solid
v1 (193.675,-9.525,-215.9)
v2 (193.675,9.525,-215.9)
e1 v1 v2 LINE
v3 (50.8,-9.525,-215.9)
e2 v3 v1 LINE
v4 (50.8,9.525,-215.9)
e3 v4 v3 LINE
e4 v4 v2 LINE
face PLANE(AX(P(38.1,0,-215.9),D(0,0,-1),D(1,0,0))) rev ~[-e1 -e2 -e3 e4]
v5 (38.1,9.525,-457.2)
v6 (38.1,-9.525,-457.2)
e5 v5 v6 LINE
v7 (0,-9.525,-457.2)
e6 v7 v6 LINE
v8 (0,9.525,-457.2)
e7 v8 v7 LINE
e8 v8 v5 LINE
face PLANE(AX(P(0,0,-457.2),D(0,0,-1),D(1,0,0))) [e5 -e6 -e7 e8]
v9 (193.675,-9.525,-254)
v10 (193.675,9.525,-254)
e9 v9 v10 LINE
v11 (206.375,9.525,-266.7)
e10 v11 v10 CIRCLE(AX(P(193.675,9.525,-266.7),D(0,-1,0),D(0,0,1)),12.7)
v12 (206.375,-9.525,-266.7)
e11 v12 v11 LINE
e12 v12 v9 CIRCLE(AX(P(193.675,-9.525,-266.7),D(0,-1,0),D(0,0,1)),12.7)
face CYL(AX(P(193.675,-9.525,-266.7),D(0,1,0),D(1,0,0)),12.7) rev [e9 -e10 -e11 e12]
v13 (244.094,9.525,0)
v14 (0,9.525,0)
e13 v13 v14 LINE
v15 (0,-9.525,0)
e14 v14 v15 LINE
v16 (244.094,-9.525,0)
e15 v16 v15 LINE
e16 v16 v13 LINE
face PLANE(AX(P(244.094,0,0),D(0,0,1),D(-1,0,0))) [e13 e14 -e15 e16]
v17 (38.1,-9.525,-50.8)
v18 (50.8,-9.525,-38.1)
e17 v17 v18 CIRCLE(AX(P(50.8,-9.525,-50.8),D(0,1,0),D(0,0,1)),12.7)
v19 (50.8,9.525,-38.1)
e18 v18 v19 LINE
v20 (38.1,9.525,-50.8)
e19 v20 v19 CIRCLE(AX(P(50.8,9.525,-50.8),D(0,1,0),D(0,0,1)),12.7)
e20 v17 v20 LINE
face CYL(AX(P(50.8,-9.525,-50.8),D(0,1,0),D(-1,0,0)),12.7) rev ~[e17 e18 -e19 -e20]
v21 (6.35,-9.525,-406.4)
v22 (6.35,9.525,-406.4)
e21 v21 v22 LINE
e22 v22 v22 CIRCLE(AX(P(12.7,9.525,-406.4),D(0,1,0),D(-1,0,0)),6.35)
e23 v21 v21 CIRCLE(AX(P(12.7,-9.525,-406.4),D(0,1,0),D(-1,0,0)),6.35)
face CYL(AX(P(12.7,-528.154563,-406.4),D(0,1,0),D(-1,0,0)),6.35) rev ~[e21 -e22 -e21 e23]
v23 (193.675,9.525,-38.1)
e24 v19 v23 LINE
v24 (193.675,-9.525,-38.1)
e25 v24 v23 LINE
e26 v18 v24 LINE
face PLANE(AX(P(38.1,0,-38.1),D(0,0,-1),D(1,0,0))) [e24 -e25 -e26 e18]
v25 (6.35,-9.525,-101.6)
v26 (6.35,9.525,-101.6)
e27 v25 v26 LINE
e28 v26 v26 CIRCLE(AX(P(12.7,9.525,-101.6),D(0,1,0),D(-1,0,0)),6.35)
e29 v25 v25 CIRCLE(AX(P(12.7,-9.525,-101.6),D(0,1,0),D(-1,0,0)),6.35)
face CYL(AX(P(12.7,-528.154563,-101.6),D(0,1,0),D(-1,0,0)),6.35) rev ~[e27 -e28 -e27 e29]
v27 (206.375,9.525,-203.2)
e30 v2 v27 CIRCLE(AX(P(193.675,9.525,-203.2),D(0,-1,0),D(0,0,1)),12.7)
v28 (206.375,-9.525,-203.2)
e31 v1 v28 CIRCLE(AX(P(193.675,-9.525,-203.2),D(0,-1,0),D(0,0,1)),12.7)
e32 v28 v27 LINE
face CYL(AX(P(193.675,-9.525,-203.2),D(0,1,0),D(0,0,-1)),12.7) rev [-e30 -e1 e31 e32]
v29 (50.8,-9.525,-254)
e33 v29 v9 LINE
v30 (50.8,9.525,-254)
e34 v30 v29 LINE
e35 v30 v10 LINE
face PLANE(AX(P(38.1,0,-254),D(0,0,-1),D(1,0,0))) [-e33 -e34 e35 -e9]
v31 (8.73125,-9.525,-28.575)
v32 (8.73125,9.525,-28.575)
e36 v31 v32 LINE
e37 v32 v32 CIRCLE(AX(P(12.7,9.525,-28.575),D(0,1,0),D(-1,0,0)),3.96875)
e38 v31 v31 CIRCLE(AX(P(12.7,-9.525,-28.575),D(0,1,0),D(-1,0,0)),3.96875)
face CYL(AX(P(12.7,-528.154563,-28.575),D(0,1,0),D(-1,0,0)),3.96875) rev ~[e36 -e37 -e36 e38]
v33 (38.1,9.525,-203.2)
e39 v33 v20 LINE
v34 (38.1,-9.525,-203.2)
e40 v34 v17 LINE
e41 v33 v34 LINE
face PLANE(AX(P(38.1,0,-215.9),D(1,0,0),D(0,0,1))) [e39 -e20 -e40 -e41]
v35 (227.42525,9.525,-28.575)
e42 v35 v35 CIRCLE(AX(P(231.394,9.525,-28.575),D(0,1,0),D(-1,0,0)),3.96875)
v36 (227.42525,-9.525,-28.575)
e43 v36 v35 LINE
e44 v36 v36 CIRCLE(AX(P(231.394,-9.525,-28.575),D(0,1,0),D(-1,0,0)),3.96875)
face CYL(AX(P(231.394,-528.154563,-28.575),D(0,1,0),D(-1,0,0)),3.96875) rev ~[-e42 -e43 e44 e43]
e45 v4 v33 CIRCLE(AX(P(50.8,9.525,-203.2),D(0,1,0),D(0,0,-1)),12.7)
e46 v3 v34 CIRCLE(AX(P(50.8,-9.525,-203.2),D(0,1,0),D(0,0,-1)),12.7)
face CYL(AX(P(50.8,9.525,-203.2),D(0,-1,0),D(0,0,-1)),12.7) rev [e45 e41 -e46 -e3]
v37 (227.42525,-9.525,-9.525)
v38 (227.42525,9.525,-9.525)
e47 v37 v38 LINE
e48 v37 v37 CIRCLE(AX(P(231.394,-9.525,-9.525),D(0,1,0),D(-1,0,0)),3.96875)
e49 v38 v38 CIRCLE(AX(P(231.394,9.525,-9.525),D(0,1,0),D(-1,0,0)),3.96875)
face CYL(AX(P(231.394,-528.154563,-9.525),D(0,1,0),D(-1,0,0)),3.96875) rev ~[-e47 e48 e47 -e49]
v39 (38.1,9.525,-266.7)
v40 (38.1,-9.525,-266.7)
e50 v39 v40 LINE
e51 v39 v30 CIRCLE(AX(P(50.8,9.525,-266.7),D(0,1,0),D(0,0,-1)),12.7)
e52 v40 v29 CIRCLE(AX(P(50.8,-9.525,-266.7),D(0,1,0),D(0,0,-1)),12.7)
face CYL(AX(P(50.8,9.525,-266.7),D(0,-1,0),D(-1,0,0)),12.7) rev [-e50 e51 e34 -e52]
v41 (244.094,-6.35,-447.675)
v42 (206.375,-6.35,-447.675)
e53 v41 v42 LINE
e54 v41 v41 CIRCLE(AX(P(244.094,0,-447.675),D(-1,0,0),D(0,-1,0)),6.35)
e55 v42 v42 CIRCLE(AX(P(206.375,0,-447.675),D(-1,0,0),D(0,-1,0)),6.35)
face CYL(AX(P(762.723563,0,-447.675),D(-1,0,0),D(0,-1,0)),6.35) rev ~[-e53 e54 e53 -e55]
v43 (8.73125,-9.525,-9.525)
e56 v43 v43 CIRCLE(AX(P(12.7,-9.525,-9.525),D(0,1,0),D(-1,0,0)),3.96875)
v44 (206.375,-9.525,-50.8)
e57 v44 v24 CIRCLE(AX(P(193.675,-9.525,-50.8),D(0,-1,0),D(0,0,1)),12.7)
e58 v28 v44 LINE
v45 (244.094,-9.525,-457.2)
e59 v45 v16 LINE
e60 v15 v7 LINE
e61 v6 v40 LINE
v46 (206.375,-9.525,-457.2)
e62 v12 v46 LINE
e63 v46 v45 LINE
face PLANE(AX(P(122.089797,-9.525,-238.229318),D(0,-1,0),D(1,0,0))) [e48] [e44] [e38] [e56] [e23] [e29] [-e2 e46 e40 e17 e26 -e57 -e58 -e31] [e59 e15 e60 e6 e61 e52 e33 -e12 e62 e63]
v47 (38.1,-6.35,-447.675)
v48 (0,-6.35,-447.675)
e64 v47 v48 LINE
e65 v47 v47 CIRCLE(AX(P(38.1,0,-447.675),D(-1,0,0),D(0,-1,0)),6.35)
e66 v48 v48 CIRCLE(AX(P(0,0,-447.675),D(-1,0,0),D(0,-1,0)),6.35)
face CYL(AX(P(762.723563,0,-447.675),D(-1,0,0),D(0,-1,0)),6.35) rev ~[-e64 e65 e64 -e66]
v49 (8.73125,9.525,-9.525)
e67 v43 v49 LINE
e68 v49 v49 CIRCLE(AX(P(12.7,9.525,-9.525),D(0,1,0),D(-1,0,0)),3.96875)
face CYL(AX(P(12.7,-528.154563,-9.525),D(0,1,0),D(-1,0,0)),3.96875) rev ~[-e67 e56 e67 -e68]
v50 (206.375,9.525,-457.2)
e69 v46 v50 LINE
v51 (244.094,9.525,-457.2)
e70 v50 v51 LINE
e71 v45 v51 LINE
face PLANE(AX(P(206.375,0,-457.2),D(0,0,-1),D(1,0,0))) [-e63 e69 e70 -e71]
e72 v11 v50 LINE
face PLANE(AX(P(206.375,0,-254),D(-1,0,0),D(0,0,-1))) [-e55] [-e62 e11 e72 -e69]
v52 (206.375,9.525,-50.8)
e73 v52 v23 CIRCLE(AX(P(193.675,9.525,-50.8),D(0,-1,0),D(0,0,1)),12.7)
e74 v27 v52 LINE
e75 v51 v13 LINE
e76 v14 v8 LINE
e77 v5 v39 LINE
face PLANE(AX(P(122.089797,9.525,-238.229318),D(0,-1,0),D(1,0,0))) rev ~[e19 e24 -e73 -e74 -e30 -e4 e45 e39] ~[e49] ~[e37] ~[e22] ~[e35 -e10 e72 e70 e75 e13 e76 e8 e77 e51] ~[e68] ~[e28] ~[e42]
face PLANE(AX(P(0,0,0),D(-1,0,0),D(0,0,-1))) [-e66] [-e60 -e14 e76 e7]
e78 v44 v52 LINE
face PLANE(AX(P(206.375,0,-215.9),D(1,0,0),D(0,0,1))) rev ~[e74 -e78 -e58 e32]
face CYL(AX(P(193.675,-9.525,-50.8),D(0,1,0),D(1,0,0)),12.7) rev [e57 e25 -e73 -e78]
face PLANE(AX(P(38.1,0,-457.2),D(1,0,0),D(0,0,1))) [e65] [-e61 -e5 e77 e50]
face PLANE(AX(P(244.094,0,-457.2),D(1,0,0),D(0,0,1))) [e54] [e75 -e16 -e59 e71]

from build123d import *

# Parameters (mm, degrees)
F0_W     = 168.275
F0_H     = 177.8
F1_DEPTH = 9.525
F3_D     = 12.7
F5_D     = 12.7
F7_D     = 7.9375
F8_R     = 12.7


# Not quite as in the source:
# - a length typed as a fraction of an inch, garbled in the dataset ("3 / 203.2 mm" for 3/8 in), is restored


with BuildPart() as f1:
    # F0 (on Front) → F1 (new body, symmetric)
    with BuildSketch(Plane.XZ):
        Polygon((244.094, 0), (0, 0), (0, -457.2), (38.1, -457.2), (38.1, -254), (206.375, -254), (206.375, -457.2), (244.094, -457.2), align=None)
        with Locations((122.2375, -127)):
            Rectangle(F0_W, F0_H, mode=Mode.SUBTRACT)
    extrude(amount=F1_DEPTH, both=True)

    # F3 (through all)
    with Locations(Plane.YZ.offset(244.094)):
        with Locations((0, -447.675)):
            Hole(F3_D / 2)

    # F5 (through all)
    with Locations(Plane.XZ.offset(9.525)):
        with Locations((12.7, -406.4), (12.7, -101.6)):
            Hole(F5_D / 2)

    # F7 (through all)
    with Locations(Plane.XZ.offset(9.525)):
        with Locations((12.7, -9.525), (12.7, -28.575), (231.394, -28.575), (231.394, -9.525)):
            Hole(F7_D / 2)

    # F8
    f8_edges = [f1.edges().sort_by_distance(p)[0] for p in [
        (38.1, 0, -38.1),
        (206.375, 0, -38.1),
        (206.375, 0, -215.9),
        (38.1, 0, -215.9),
        (206.375, 0, -254),
        (38.1, 0, -254),
    ]]
    fillet(f8_edges, radius=F8_R)


solid = f1.part
